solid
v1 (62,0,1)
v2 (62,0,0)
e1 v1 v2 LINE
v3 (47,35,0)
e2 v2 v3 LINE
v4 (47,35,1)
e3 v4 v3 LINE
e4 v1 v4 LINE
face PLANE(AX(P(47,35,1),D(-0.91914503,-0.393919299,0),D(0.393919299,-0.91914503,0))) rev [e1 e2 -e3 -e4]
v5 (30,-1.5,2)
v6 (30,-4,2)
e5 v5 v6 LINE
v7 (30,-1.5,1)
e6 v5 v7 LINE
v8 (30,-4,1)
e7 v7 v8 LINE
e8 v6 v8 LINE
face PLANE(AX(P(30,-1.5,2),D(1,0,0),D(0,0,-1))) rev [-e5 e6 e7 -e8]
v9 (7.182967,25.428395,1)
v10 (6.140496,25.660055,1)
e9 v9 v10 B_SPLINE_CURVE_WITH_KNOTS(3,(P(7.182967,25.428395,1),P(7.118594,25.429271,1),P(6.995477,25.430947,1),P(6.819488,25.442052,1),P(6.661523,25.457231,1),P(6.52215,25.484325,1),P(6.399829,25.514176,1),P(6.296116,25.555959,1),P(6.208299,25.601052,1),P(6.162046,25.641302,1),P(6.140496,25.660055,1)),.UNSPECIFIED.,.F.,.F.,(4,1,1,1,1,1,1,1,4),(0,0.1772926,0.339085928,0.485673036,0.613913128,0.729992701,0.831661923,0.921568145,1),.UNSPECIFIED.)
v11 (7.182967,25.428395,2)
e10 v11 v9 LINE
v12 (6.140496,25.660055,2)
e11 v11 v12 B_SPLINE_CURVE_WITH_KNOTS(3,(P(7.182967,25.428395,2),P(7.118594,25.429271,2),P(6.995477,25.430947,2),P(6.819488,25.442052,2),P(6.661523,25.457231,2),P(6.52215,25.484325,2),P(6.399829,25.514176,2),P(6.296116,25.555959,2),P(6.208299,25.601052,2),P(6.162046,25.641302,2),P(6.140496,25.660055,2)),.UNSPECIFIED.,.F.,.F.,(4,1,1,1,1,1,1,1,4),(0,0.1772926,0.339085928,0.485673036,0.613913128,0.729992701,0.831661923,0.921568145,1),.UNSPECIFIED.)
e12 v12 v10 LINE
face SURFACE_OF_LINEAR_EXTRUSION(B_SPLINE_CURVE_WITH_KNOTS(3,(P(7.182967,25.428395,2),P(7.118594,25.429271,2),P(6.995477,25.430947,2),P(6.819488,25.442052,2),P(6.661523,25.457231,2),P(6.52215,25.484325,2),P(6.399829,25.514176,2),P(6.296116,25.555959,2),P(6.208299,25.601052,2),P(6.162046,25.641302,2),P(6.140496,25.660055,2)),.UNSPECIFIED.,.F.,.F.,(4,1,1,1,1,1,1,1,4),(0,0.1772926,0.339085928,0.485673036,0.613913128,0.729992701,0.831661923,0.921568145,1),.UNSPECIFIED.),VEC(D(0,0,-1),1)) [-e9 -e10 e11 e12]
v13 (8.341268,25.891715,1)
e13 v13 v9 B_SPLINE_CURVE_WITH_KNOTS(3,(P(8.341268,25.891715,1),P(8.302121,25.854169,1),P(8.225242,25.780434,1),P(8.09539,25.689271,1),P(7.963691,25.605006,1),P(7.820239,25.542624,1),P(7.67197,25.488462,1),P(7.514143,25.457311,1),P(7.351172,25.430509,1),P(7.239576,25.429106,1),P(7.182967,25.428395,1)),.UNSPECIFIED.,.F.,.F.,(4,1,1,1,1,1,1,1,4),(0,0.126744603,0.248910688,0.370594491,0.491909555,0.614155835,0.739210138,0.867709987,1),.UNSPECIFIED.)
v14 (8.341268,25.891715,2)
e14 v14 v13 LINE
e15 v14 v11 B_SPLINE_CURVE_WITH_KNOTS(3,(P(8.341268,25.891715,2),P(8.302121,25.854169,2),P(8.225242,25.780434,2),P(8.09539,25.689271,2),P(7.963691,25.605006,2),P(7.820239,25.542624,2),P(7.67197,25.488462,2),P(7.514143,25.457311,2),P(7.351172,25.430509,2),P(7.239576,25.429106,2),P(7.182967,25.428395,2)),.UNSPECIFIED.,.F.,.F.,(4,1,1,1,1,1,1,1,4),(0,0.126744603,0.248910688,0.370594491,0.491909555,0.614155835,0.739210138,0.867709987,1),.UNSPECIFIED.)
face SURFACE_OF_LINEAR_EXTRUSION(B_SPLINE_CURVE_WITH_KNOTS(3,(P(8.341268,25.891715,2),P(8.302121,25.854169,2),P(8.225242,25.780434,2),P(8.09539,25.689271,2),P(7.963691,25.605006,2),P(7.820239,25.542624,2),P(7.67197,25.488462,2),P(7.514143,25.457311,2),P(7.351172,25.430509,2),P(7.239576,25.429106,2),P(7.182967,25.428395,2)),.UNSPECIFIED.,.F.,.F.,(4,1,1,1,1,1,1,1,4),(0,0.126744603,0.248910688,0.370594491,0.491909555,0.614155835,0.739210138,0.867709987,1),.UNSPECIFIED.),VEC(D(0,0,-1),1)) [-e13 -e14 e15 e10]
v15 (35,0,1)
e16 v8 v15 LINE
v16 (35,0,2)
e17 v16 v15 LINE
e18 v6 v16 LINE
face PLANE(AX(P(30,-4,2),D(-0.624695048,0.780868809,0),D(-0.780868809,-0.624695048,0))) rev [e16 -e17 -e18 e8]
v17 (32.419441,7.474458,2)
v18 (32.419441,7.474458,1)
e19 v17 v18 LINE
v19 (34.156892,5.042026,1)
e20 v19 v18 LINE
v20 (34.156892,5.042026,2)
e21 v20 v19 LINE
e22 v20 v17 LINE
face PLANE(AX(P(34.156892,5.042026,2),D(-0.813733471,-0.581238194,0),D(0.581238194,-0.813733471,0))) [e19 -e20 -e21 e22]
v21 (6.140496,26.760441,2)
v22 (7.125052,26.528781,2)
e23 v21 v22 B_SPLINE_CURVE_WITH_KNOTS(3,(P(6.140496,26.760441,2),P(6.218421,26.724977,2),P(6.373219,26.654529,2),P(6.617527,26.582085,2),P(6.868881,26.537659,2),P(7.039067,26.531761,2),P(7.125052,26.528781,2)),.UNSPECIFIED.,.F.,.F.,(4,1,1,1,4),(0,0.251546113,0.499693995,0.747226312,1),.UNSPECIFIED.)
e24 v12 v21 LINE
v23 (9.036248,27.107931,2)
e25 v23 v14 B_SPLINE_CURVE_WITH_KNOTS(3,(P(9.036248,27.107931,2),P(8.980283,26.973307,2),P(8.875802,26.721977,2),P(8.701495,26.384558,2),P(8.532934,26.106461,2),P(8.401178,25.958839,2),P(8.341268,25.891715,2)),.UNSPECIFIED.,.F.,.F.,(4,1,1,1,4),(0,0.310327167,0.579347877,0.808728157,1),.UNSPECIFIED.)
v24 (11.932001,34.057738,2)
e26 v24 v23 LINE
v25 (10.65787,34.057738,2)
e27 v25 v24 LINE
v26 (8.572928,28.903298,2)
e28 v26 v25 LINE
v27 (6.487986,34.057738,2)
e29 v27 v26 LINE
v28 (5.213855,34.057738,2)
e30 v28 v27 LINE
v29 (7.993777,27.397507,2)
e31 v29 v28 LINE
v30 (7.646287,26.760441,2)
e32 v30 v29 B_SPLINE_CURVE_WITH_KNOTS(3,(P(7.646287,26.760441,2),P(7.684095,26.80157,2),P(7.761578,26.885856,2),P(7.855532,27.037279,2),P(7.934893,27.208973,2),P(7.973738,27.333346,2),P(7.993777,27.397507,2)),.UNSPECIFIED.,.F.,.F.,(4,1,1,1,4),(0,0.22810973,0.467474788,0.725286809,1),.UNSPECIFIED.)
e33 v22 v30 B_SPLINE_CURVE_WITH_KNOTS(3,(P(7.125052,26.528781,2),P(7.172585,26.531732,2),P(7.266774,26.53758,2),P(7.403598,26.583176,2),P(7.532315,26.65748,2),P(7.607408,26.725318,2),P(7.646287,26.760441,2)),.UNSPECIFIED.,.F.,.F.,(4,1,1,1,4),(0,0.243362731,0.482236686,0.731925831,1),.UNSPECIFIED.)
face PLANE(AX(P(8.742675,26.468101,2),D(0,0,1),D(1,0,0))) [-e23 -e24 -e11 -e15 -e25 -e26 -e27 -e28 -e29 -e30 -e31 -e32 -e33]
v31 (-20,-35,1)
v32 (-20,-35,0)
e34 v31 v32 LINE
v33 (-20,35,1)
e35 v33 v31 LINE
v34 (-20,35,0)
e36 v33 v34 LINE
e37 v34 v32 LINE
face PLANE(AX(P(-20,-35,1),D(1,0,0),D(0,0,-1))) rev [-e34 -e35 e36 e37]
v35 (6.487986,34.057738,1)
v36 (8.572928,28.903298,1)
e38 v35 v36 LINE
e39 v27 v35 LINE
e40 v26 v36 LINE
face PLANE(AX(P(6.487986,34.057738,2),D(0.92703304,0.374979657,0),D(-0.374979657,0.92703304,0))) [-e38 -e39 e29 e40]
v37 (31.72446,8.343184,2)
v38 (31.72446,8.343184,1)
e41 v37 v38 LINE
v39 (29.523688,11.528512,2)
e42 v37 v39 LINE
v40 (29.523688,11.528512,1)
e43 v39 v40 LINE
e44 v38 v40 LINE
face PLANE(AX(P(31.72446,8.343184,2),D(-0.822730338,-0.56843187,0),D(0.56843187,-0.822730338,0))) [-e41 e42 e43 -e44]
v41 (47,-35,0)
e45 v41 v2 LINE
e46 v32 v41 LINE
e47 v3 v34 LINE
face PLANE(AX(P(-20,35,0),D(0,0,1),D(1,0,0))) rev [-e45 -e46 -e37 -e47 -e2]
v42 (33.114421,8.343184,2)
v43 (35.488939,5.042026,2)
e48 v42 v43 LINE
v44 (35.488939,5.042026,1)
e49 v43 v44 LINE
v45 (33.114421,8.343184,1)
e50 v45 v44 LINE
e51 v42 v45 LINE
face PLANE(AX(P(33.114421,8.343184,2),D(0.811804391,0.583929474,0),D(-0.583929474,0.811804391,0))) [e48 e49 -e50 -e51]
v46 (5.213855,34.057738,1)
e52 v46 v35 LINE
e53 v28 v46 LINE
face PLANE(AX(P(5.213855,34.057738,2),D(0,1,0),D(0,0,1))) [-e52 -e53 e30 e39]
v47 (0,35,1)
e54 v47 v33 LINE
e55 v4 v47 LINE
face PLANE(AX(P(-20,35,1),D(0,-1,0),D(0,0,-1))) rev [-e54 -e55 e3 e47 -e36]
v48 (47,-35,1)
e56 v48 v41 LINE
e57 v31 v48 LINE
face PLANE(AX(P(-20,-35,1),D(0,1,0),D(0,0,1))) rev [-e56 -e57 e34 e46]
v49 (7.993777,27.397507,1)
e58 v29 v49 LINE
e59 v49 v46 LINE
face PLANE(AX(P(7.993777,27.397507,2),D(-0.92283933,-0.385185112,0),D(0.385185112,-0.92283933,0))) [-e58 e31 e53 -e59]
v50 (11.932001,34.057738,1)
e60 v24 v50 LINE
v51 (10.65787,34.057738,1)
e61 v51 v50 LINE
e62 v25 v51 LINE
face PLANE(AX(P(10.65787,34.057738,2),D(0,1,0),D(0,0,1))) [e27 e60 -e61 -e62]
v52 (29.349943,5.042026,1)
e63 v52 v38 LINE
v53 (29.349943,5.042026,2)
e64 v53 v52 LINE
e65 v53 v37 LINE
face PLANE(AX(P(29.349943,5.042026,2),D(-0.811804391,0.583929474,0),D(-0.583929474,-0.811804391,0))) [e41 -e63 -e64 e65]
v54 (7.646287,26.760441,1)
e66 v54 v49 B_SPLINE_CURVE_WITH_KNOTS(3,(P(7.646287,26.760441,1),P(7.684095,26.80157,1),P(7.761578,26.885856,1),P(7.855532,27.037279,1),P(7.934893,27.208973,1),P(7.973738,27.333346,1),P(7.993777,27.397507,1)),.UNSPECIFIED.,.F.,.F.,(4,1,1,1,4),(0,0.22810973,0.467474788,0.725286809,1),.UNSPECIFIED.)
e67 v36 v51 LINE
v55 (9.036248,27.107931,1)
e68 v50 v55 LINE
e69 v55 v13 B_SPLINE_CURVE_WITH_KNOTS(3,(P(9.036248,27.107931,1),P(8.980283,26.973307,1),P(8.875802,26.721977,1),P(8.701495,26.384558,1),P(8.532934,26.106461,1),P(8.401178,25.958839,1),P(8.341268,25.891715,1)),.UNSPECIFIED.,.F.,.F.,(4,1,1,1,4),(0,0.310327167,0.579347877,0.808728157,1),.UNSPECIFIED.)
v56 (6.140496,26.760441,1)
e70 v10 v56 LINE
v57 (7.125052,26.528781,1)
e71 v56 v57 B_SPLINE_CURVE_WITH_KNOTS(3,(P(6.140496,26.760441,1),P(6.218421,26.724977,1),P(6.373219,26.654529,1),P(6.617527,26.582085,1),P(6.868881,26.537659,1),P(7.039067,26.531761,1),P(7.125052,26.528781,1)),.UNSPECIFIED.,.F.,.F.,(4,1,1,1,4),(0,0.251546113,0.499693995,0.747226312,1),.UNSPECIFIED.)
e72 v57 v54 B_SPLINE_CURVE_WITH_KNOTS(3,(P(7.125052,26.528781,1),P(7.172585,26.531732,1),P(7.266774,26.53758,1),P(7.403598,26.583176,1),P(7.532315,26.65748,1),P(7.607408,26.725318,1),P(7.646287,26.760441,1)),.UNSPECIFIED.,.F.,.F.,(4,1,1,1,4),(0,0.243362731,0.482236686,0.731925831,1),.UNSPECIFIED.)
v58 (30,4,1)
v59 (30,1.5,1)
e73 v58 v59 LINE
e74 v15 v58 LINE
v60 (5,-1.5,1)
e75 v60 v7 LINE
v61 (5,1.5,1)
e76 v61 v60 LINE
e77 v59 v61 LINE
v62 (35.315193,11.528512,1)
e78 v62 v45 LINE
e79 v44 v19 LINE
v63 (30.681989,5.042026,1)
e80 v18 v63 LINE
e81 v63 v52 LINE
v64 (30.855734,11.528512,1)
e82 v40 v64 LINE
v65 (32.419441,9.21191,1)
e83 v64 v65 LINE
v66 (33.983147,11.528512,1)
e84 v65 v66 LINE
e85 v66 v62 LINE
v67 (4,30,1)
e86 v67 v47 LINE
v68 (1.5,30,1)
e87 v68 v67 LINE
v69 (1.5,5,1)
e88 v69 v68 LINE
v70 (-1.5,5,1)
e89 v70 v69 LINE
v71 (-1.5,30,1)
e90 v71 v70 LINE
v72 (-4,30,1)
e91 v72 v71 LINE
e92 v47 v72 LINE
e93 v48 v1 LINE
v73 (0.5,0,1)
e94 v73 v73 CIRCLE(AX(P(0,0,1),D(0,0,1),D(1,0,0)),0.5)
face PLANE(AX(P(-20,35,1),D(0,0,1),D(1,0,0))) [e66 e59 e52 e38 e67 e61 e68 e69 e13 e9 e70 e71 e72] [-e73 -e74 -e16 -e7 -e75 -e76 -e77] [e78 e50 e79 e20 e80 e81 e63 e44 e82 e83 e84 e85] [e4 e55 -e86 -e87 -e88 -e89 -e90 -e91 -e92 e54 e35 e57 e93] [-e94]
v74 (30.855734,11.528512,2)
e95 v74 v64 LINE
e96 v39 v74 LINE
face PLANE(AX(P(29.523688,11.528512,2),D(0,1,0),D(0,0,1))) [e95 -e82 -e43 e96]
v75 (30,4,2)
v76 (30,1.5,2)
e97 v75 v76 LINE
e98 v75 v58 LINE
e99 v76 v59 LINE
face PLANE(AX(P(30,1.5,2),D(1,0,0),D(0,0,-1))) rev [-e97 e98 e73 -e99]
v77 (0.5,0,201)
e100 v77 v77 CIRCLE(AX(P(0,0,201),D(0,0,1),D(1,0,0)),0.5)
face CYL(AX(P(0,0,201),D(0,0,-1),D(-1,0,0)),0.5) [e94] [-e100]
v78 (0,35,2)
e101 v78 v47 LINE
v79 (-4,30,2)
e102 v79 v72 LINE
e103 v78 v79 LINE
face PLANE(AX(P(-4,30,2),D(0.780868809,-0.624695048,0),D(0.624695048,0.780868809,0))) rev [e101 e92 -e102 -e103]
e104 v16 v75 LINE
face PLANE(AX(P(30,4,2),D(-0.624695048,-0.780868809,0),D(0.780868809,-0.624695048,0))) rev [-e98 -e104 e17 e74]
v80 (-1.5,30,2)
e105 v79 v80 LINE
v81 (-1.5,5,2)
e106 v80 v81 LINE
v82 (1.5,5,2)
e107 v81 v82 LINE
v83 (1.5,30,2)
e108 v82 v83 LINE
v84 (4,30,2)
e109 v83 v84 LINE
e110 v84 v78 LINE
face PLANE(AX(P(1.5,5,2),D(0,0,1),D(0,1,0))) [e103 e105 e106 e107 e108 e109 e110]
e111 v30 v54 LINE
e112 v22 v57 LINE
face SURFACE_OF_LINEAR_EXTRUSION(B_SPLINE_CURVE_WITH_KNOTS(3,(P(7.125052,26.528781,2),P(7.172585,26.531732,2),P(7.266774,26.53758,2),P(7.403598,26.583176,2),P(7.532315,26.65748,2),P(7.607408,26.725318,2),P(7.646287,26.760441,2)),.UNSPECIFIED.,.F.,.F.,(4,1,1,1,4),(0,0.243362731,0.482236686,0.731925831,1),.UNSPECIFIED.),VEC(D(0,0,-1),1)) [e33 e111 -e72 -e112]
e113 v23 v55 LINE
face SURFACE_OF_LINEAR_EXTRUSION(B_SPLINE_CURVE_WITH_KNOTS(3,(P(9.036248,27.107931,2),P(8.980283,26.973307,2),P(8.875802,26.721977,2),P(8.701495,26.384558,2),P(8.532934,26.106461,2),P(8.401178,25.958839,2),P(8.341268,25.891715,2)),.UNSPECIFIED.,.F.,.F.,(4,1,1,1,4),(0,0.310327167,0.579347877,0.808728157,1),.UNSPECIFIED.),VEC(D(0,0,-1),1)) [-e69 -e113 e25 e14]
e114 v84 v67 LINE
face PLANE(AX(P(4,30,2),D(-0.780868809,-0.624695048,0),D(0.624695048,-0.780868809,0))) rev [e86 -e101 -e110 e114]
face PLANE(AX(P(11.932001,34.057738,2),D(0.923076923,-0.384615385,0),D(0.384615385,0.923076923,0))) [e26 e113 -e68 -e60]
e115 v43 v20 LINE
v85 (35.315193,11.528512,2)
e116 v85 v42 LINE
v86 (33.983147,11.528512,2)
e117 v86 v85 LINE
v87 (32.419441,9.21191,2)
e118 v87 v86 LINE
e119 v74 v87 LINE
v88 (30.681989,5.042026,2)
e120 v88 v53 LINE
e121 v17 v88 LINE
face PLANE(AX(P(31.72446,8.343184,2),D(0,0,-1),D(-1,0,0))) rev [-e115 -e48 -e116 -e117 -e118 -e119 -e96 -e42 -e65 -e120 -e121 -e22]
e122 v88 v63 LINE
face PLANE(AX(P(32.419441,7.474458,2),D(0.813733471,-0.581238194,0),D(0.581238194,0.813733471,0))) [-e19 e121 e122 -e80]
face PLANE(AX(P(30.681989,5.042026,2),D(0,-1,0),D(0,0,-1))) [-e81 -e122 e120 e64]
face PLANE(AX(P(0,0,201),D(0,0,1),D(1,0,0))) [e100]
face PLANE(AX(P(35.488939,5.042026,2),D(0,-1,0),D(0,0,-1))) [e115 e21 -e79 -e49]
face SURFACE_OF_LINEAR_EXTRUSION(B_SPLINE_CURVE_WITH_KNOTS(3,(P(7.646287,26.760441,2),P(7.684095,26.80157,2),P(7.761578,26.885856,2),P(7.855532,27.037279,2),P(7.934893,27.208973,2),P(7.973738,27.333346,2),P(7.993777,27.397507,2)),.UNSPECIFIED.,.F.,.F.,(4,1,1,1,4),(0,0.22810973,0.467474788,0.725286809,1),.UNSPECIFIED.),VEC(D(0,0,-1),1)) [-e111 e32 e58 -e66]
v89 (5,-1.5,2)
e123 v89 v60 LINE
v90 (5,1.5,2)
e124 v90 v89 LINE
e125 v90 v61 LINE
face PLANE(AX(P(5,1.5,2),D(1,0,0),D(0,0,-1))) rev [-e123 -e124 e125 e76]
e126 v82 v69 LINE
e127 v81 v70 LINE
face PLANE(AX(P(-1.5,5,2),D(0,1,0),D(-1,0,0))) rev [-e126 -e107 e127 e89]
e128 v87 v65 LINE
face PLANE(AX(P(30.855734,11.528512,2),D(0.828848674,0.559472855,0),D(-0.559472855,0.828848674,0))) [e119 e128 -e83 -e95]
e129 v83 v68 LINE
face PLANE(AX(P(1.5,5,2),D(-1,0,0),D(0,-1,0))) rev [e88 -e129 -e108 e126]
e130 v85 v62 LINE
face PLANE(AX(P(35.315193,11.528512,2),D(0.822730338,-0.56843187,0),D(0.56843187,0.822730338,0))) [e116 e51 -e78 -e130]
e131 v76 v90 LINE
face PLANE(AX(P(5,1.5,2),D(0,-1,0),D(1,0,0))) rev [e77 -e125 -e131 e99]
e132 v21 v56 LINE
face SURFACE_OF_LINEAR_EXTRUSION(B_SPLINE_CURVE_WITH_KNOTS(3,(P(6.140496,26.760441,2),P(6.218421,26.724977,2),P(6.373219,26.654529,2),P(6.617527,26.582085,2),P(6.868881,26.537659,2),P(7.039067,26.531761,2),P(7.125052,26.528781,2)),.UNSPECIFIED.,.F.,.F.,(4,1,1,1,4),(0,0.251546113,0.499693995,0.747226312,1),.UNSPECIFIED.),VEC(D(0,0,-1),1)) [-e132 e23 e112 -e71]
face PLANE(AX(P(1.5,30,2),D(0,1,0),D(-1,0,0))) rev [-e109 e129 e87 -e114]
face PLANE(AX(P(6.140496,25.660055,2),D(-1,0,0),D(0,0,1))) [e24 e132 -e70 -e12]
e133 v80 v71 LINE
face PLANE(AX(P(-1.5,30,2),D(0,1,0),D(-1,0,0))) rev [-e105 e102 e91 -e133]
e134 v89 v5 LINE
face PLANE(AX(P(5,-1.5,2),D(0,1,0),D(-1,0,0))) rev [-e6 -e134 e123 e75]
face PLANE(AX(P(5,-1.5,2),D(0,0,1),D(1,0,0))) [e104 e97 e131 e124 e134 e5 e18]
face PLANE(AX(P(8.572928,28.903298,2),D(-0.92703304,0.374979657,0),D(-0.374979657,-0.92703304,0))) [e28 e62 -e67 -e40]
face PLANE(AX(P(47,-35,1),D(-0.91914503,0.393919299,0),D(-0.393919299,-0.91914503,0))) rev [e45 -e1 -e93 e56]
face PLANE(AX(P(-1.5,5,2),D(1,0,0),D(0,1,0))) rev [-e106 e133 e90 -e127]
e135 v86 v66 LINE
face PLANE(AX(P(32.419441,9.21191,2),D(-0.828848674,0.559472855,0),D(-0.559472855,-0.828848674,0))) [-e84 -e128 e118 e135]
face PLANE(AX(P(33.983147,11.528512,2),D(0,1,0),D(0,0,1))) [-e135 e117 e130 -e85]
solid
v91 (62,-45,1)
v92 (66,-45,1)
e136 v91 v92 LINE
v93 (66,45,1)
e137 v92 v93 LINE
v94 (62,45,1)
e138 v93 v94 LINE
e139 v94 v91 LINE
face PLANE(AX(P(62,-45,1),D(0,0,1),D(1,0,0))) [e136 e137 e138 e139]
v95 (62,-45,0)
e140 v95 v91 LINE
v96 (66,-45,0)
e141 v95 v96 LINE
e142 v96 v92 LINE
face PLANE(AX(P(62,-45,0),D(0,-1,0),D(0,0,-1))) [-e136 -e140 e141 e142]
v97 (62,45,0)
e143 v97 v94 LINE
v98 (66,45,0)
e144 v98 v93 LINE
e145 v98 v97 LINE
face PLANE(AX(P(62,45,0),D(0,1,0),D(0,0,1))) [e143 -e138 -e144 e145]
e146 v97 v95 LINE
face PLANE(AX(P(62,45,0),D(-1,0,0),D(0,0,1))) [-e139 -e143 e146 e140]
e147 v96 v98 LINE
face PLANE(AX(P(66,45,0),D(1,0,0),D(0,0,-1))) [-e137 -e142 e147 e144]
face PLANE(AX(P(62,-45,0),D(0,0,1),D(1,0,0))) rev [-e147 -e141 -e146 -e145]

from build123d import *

# Parameters (mm, degrees)
EXTRUDE_1_DEPTH          = 1
SKETCH_2_R               = 0.5
EXTRUDE_2_DEPTH          = 200
EXTRUDE_3_DEPTH          = 1
PATTERN_CIRCULAR_1_COUNT = 2
PATTERN_CIRCULAR_1_ANGLE = 90
SKETCH_4_W               = 4
SKETCH_4_H               = 90
EXTRUDE_4_DEPTH          = 1
EXTRUDE_START            = 1
EXTRUDE_5_DEPTH          = 1


# Read off the part's stored shape, not the designer's step: 押し出し5
with BuildPart() as part:
    # ｽｹｯﾁ1 → 押し出し1 (new body)
    with BuildSketch(Plane.XY):
        Polygon((-20, -35), (-20, 35), (47, 35), (62, 0), (47, -35), align=None)
    extrude(amount=EXTRUDE_1_DEPTH)

    # ｽｹｯﾁ2 → 押し出し2 (add)
    with BuildSketch(Plane.XY.offset(1)):
        Circle(SKETCH_2_R)
    extrude(amount=EXTRUDE_2_DEPTH)

    # ｽｹｯﾁ3 → 押し出し3 (add)
    with BuildSketch(Plane.XY.offset(1)):
        Polygon((5, 1.5), (30, 1.5), (30, 4), (35, 0), (30, -4), (30, -1.5), (5, -1.5), align=None)
    extrude_3 = extrude(amount=EXTRUDE_3_DEPTH)

    # 円形ﾊﾟﾀｰﾝ1: 押し出し3 ×2 about axis
    pattern_circular_1_axis = Axis((0, 0, 0), (0, 0, 1))
    for i in range(1, PATTERN_CIRCULAR_1_COUNT):
        add(extrude_3.rotate(pattern_circular_1_axis, i * PATTERN_CIRCULAR_1_ANGLE / (PATTERN_CIRCULAR_1_COUNT - 1)))

    # 押し出し5 outline → 押し出し5 (add)
    with BuildSketch(Plane.XY.offset(EXTRUDE_START)):
        with BuildLine():
            add(Edge.make_bspline(
                [(7.646287037, 26.760441027), (7.684095406, 26.801569572), (7.761577676, 26.885856016), (7.855531929, 27.037278743), (7.934893033, 27.208972806), (7.973738313, 27.333346265), (7.993777384, 27.397506664)],
                knots=[0, 0, 0, 0, 0.22810973, 0.467474788, 0.725286809, 1, 1, 1, 1], degree=3))
            add(Edge.make_bspline(
                [(7.125051515, 26.528780796), (7.172584701, 26.531731962), (7.266774333, 26.537579862), (7.403597881, 26.583175986), (7.532315033, 26.657479619), (7.60740756, 26.725317615), (7.646287037, 26.760441027)],
                knots=[0, 0, 0, 0, 0.243362731, 0.482236686, 0.731925831, 1, 1, 1, 1], degree=3))
            add(Edge.make_bspline(
                [(6.140495531, 26.760441027), (6.218421027, 26.724977416), (6.373219293, 26.654529285), (6.617526792, 26.582085472), (6.868880788, 26.53765901), (7.039066964, 26.531760798), (7.125051515, 26.528780796)],
                knots=[0, 0, 0, 0, 0.251546113, 0.499693995, 0.747226312, 1, 1, 1, 1], degree=3))
            Line((6.140495531, 26.760441027), (6.140495531, 25.660054927))
            add(Edge.make_bspline(
                [(7.182966573, 25.428394695), (7.118594105, 25.429270849), (6.995476736, 25.430946562), (6.819487787, 25.442051989), (6.661523317, 25.457230921), (6.522149821, 25.484324643), (6.399828508, 25.514176487), (6.296115706, 25.555959151), (6.208298793, 25.60105168), (6.162045708, 25.641301694), (6.140495531, 25.660054927)],
                knots=[0, 0, 0, 0, 0.1772926, 0.339085928, 0.485673036, 0.613913128, 0.729992701, 0.831661923, 0.921568145, 1, 1, 1, 1], degree=3))
            add(Edge.make_bspline(
                [(8.341267732, 25.891715158), (8.302121003, 25.854169248), (8.225241681, 25.780433735), (8.095389821, 25.689271494), (7.963691437, 25.605006111), (7.820239111, 25.542623748), (7.671969703, 25.48846247), (7.514142965, 25.457310676), (7.351171612, 25.430508848), (7.239575543, 25.429106208), (7.182966573, 25.428394695)],
                knots=[0, 0, 0, 0, 0.126744603, 0.248910688, 0.370594491, 0.491909555, 0.614155835, 0.739210138, 0.867709987, 1, 1, 1, 1], degree=3))
            add(Edge.make_bspline(
                [(9.036248427, 27.107931375), (8.980283218, 26.973306878), (8.875802115, 26.721977235), (8.701494643, 26.384557747), (8.532933914, 26.106460729), (8.401177698, 25.958839153), (8.341267732, 25.891715158)],
                knots=[0, 0, 0, 0, 0.310327167, 0.579347877, 0.808728157, 1, 1, 1, 1], degree=3))
            Line((9.036248427, 27.107931375), (11.932001322, 34.057738324))
            Line((11.932001322, 34.057738324), (10.657870048, 34.057738324))
            Line((10.657870048, 34.057738324), (8.572927963, 28.90329817))
            Line((8.572927963, 28.90329817), (6.487985878, 34.057738324))
            Line((6.487985878, 34.057738324), (5.213854604, 34.057738324))
            Line((5.213854604, 34.057738324), (7.993777384, 27.397506664))
        make_face()
        Polygon((30.855734024, 11.52851209), (29.523687692, 11.52851209), (31.724459892, 8.343183904), (29.349942518, 5.042025603), (30.68198885, 5.042025603), (32.419440587, 7.474458036), (34.156892325, 5.042025603), (35.488938657, 5.042025603), (33.114421282, 8.343183904), (35.315193483, 11.52851209), (33.983147151, 11.52851209), (32.419440587, 9.211909773), align=None)
    extrude(amount=EXTRUDE_5_DEPTH)


with BuildPart() as body_2:
    # ｽｹｯﾁ4 → 押し出し4 (new body)
    with BuildSketch(Plane.XY.offset(1)):
        with Locations((64, 0)):
            Rectangle(SKETCH_4_W, SKETCH_4_H)
    extrude(amount=-EXTRUDE_4_DEPTH)


solid = Compound([part.part, body_2.part])
